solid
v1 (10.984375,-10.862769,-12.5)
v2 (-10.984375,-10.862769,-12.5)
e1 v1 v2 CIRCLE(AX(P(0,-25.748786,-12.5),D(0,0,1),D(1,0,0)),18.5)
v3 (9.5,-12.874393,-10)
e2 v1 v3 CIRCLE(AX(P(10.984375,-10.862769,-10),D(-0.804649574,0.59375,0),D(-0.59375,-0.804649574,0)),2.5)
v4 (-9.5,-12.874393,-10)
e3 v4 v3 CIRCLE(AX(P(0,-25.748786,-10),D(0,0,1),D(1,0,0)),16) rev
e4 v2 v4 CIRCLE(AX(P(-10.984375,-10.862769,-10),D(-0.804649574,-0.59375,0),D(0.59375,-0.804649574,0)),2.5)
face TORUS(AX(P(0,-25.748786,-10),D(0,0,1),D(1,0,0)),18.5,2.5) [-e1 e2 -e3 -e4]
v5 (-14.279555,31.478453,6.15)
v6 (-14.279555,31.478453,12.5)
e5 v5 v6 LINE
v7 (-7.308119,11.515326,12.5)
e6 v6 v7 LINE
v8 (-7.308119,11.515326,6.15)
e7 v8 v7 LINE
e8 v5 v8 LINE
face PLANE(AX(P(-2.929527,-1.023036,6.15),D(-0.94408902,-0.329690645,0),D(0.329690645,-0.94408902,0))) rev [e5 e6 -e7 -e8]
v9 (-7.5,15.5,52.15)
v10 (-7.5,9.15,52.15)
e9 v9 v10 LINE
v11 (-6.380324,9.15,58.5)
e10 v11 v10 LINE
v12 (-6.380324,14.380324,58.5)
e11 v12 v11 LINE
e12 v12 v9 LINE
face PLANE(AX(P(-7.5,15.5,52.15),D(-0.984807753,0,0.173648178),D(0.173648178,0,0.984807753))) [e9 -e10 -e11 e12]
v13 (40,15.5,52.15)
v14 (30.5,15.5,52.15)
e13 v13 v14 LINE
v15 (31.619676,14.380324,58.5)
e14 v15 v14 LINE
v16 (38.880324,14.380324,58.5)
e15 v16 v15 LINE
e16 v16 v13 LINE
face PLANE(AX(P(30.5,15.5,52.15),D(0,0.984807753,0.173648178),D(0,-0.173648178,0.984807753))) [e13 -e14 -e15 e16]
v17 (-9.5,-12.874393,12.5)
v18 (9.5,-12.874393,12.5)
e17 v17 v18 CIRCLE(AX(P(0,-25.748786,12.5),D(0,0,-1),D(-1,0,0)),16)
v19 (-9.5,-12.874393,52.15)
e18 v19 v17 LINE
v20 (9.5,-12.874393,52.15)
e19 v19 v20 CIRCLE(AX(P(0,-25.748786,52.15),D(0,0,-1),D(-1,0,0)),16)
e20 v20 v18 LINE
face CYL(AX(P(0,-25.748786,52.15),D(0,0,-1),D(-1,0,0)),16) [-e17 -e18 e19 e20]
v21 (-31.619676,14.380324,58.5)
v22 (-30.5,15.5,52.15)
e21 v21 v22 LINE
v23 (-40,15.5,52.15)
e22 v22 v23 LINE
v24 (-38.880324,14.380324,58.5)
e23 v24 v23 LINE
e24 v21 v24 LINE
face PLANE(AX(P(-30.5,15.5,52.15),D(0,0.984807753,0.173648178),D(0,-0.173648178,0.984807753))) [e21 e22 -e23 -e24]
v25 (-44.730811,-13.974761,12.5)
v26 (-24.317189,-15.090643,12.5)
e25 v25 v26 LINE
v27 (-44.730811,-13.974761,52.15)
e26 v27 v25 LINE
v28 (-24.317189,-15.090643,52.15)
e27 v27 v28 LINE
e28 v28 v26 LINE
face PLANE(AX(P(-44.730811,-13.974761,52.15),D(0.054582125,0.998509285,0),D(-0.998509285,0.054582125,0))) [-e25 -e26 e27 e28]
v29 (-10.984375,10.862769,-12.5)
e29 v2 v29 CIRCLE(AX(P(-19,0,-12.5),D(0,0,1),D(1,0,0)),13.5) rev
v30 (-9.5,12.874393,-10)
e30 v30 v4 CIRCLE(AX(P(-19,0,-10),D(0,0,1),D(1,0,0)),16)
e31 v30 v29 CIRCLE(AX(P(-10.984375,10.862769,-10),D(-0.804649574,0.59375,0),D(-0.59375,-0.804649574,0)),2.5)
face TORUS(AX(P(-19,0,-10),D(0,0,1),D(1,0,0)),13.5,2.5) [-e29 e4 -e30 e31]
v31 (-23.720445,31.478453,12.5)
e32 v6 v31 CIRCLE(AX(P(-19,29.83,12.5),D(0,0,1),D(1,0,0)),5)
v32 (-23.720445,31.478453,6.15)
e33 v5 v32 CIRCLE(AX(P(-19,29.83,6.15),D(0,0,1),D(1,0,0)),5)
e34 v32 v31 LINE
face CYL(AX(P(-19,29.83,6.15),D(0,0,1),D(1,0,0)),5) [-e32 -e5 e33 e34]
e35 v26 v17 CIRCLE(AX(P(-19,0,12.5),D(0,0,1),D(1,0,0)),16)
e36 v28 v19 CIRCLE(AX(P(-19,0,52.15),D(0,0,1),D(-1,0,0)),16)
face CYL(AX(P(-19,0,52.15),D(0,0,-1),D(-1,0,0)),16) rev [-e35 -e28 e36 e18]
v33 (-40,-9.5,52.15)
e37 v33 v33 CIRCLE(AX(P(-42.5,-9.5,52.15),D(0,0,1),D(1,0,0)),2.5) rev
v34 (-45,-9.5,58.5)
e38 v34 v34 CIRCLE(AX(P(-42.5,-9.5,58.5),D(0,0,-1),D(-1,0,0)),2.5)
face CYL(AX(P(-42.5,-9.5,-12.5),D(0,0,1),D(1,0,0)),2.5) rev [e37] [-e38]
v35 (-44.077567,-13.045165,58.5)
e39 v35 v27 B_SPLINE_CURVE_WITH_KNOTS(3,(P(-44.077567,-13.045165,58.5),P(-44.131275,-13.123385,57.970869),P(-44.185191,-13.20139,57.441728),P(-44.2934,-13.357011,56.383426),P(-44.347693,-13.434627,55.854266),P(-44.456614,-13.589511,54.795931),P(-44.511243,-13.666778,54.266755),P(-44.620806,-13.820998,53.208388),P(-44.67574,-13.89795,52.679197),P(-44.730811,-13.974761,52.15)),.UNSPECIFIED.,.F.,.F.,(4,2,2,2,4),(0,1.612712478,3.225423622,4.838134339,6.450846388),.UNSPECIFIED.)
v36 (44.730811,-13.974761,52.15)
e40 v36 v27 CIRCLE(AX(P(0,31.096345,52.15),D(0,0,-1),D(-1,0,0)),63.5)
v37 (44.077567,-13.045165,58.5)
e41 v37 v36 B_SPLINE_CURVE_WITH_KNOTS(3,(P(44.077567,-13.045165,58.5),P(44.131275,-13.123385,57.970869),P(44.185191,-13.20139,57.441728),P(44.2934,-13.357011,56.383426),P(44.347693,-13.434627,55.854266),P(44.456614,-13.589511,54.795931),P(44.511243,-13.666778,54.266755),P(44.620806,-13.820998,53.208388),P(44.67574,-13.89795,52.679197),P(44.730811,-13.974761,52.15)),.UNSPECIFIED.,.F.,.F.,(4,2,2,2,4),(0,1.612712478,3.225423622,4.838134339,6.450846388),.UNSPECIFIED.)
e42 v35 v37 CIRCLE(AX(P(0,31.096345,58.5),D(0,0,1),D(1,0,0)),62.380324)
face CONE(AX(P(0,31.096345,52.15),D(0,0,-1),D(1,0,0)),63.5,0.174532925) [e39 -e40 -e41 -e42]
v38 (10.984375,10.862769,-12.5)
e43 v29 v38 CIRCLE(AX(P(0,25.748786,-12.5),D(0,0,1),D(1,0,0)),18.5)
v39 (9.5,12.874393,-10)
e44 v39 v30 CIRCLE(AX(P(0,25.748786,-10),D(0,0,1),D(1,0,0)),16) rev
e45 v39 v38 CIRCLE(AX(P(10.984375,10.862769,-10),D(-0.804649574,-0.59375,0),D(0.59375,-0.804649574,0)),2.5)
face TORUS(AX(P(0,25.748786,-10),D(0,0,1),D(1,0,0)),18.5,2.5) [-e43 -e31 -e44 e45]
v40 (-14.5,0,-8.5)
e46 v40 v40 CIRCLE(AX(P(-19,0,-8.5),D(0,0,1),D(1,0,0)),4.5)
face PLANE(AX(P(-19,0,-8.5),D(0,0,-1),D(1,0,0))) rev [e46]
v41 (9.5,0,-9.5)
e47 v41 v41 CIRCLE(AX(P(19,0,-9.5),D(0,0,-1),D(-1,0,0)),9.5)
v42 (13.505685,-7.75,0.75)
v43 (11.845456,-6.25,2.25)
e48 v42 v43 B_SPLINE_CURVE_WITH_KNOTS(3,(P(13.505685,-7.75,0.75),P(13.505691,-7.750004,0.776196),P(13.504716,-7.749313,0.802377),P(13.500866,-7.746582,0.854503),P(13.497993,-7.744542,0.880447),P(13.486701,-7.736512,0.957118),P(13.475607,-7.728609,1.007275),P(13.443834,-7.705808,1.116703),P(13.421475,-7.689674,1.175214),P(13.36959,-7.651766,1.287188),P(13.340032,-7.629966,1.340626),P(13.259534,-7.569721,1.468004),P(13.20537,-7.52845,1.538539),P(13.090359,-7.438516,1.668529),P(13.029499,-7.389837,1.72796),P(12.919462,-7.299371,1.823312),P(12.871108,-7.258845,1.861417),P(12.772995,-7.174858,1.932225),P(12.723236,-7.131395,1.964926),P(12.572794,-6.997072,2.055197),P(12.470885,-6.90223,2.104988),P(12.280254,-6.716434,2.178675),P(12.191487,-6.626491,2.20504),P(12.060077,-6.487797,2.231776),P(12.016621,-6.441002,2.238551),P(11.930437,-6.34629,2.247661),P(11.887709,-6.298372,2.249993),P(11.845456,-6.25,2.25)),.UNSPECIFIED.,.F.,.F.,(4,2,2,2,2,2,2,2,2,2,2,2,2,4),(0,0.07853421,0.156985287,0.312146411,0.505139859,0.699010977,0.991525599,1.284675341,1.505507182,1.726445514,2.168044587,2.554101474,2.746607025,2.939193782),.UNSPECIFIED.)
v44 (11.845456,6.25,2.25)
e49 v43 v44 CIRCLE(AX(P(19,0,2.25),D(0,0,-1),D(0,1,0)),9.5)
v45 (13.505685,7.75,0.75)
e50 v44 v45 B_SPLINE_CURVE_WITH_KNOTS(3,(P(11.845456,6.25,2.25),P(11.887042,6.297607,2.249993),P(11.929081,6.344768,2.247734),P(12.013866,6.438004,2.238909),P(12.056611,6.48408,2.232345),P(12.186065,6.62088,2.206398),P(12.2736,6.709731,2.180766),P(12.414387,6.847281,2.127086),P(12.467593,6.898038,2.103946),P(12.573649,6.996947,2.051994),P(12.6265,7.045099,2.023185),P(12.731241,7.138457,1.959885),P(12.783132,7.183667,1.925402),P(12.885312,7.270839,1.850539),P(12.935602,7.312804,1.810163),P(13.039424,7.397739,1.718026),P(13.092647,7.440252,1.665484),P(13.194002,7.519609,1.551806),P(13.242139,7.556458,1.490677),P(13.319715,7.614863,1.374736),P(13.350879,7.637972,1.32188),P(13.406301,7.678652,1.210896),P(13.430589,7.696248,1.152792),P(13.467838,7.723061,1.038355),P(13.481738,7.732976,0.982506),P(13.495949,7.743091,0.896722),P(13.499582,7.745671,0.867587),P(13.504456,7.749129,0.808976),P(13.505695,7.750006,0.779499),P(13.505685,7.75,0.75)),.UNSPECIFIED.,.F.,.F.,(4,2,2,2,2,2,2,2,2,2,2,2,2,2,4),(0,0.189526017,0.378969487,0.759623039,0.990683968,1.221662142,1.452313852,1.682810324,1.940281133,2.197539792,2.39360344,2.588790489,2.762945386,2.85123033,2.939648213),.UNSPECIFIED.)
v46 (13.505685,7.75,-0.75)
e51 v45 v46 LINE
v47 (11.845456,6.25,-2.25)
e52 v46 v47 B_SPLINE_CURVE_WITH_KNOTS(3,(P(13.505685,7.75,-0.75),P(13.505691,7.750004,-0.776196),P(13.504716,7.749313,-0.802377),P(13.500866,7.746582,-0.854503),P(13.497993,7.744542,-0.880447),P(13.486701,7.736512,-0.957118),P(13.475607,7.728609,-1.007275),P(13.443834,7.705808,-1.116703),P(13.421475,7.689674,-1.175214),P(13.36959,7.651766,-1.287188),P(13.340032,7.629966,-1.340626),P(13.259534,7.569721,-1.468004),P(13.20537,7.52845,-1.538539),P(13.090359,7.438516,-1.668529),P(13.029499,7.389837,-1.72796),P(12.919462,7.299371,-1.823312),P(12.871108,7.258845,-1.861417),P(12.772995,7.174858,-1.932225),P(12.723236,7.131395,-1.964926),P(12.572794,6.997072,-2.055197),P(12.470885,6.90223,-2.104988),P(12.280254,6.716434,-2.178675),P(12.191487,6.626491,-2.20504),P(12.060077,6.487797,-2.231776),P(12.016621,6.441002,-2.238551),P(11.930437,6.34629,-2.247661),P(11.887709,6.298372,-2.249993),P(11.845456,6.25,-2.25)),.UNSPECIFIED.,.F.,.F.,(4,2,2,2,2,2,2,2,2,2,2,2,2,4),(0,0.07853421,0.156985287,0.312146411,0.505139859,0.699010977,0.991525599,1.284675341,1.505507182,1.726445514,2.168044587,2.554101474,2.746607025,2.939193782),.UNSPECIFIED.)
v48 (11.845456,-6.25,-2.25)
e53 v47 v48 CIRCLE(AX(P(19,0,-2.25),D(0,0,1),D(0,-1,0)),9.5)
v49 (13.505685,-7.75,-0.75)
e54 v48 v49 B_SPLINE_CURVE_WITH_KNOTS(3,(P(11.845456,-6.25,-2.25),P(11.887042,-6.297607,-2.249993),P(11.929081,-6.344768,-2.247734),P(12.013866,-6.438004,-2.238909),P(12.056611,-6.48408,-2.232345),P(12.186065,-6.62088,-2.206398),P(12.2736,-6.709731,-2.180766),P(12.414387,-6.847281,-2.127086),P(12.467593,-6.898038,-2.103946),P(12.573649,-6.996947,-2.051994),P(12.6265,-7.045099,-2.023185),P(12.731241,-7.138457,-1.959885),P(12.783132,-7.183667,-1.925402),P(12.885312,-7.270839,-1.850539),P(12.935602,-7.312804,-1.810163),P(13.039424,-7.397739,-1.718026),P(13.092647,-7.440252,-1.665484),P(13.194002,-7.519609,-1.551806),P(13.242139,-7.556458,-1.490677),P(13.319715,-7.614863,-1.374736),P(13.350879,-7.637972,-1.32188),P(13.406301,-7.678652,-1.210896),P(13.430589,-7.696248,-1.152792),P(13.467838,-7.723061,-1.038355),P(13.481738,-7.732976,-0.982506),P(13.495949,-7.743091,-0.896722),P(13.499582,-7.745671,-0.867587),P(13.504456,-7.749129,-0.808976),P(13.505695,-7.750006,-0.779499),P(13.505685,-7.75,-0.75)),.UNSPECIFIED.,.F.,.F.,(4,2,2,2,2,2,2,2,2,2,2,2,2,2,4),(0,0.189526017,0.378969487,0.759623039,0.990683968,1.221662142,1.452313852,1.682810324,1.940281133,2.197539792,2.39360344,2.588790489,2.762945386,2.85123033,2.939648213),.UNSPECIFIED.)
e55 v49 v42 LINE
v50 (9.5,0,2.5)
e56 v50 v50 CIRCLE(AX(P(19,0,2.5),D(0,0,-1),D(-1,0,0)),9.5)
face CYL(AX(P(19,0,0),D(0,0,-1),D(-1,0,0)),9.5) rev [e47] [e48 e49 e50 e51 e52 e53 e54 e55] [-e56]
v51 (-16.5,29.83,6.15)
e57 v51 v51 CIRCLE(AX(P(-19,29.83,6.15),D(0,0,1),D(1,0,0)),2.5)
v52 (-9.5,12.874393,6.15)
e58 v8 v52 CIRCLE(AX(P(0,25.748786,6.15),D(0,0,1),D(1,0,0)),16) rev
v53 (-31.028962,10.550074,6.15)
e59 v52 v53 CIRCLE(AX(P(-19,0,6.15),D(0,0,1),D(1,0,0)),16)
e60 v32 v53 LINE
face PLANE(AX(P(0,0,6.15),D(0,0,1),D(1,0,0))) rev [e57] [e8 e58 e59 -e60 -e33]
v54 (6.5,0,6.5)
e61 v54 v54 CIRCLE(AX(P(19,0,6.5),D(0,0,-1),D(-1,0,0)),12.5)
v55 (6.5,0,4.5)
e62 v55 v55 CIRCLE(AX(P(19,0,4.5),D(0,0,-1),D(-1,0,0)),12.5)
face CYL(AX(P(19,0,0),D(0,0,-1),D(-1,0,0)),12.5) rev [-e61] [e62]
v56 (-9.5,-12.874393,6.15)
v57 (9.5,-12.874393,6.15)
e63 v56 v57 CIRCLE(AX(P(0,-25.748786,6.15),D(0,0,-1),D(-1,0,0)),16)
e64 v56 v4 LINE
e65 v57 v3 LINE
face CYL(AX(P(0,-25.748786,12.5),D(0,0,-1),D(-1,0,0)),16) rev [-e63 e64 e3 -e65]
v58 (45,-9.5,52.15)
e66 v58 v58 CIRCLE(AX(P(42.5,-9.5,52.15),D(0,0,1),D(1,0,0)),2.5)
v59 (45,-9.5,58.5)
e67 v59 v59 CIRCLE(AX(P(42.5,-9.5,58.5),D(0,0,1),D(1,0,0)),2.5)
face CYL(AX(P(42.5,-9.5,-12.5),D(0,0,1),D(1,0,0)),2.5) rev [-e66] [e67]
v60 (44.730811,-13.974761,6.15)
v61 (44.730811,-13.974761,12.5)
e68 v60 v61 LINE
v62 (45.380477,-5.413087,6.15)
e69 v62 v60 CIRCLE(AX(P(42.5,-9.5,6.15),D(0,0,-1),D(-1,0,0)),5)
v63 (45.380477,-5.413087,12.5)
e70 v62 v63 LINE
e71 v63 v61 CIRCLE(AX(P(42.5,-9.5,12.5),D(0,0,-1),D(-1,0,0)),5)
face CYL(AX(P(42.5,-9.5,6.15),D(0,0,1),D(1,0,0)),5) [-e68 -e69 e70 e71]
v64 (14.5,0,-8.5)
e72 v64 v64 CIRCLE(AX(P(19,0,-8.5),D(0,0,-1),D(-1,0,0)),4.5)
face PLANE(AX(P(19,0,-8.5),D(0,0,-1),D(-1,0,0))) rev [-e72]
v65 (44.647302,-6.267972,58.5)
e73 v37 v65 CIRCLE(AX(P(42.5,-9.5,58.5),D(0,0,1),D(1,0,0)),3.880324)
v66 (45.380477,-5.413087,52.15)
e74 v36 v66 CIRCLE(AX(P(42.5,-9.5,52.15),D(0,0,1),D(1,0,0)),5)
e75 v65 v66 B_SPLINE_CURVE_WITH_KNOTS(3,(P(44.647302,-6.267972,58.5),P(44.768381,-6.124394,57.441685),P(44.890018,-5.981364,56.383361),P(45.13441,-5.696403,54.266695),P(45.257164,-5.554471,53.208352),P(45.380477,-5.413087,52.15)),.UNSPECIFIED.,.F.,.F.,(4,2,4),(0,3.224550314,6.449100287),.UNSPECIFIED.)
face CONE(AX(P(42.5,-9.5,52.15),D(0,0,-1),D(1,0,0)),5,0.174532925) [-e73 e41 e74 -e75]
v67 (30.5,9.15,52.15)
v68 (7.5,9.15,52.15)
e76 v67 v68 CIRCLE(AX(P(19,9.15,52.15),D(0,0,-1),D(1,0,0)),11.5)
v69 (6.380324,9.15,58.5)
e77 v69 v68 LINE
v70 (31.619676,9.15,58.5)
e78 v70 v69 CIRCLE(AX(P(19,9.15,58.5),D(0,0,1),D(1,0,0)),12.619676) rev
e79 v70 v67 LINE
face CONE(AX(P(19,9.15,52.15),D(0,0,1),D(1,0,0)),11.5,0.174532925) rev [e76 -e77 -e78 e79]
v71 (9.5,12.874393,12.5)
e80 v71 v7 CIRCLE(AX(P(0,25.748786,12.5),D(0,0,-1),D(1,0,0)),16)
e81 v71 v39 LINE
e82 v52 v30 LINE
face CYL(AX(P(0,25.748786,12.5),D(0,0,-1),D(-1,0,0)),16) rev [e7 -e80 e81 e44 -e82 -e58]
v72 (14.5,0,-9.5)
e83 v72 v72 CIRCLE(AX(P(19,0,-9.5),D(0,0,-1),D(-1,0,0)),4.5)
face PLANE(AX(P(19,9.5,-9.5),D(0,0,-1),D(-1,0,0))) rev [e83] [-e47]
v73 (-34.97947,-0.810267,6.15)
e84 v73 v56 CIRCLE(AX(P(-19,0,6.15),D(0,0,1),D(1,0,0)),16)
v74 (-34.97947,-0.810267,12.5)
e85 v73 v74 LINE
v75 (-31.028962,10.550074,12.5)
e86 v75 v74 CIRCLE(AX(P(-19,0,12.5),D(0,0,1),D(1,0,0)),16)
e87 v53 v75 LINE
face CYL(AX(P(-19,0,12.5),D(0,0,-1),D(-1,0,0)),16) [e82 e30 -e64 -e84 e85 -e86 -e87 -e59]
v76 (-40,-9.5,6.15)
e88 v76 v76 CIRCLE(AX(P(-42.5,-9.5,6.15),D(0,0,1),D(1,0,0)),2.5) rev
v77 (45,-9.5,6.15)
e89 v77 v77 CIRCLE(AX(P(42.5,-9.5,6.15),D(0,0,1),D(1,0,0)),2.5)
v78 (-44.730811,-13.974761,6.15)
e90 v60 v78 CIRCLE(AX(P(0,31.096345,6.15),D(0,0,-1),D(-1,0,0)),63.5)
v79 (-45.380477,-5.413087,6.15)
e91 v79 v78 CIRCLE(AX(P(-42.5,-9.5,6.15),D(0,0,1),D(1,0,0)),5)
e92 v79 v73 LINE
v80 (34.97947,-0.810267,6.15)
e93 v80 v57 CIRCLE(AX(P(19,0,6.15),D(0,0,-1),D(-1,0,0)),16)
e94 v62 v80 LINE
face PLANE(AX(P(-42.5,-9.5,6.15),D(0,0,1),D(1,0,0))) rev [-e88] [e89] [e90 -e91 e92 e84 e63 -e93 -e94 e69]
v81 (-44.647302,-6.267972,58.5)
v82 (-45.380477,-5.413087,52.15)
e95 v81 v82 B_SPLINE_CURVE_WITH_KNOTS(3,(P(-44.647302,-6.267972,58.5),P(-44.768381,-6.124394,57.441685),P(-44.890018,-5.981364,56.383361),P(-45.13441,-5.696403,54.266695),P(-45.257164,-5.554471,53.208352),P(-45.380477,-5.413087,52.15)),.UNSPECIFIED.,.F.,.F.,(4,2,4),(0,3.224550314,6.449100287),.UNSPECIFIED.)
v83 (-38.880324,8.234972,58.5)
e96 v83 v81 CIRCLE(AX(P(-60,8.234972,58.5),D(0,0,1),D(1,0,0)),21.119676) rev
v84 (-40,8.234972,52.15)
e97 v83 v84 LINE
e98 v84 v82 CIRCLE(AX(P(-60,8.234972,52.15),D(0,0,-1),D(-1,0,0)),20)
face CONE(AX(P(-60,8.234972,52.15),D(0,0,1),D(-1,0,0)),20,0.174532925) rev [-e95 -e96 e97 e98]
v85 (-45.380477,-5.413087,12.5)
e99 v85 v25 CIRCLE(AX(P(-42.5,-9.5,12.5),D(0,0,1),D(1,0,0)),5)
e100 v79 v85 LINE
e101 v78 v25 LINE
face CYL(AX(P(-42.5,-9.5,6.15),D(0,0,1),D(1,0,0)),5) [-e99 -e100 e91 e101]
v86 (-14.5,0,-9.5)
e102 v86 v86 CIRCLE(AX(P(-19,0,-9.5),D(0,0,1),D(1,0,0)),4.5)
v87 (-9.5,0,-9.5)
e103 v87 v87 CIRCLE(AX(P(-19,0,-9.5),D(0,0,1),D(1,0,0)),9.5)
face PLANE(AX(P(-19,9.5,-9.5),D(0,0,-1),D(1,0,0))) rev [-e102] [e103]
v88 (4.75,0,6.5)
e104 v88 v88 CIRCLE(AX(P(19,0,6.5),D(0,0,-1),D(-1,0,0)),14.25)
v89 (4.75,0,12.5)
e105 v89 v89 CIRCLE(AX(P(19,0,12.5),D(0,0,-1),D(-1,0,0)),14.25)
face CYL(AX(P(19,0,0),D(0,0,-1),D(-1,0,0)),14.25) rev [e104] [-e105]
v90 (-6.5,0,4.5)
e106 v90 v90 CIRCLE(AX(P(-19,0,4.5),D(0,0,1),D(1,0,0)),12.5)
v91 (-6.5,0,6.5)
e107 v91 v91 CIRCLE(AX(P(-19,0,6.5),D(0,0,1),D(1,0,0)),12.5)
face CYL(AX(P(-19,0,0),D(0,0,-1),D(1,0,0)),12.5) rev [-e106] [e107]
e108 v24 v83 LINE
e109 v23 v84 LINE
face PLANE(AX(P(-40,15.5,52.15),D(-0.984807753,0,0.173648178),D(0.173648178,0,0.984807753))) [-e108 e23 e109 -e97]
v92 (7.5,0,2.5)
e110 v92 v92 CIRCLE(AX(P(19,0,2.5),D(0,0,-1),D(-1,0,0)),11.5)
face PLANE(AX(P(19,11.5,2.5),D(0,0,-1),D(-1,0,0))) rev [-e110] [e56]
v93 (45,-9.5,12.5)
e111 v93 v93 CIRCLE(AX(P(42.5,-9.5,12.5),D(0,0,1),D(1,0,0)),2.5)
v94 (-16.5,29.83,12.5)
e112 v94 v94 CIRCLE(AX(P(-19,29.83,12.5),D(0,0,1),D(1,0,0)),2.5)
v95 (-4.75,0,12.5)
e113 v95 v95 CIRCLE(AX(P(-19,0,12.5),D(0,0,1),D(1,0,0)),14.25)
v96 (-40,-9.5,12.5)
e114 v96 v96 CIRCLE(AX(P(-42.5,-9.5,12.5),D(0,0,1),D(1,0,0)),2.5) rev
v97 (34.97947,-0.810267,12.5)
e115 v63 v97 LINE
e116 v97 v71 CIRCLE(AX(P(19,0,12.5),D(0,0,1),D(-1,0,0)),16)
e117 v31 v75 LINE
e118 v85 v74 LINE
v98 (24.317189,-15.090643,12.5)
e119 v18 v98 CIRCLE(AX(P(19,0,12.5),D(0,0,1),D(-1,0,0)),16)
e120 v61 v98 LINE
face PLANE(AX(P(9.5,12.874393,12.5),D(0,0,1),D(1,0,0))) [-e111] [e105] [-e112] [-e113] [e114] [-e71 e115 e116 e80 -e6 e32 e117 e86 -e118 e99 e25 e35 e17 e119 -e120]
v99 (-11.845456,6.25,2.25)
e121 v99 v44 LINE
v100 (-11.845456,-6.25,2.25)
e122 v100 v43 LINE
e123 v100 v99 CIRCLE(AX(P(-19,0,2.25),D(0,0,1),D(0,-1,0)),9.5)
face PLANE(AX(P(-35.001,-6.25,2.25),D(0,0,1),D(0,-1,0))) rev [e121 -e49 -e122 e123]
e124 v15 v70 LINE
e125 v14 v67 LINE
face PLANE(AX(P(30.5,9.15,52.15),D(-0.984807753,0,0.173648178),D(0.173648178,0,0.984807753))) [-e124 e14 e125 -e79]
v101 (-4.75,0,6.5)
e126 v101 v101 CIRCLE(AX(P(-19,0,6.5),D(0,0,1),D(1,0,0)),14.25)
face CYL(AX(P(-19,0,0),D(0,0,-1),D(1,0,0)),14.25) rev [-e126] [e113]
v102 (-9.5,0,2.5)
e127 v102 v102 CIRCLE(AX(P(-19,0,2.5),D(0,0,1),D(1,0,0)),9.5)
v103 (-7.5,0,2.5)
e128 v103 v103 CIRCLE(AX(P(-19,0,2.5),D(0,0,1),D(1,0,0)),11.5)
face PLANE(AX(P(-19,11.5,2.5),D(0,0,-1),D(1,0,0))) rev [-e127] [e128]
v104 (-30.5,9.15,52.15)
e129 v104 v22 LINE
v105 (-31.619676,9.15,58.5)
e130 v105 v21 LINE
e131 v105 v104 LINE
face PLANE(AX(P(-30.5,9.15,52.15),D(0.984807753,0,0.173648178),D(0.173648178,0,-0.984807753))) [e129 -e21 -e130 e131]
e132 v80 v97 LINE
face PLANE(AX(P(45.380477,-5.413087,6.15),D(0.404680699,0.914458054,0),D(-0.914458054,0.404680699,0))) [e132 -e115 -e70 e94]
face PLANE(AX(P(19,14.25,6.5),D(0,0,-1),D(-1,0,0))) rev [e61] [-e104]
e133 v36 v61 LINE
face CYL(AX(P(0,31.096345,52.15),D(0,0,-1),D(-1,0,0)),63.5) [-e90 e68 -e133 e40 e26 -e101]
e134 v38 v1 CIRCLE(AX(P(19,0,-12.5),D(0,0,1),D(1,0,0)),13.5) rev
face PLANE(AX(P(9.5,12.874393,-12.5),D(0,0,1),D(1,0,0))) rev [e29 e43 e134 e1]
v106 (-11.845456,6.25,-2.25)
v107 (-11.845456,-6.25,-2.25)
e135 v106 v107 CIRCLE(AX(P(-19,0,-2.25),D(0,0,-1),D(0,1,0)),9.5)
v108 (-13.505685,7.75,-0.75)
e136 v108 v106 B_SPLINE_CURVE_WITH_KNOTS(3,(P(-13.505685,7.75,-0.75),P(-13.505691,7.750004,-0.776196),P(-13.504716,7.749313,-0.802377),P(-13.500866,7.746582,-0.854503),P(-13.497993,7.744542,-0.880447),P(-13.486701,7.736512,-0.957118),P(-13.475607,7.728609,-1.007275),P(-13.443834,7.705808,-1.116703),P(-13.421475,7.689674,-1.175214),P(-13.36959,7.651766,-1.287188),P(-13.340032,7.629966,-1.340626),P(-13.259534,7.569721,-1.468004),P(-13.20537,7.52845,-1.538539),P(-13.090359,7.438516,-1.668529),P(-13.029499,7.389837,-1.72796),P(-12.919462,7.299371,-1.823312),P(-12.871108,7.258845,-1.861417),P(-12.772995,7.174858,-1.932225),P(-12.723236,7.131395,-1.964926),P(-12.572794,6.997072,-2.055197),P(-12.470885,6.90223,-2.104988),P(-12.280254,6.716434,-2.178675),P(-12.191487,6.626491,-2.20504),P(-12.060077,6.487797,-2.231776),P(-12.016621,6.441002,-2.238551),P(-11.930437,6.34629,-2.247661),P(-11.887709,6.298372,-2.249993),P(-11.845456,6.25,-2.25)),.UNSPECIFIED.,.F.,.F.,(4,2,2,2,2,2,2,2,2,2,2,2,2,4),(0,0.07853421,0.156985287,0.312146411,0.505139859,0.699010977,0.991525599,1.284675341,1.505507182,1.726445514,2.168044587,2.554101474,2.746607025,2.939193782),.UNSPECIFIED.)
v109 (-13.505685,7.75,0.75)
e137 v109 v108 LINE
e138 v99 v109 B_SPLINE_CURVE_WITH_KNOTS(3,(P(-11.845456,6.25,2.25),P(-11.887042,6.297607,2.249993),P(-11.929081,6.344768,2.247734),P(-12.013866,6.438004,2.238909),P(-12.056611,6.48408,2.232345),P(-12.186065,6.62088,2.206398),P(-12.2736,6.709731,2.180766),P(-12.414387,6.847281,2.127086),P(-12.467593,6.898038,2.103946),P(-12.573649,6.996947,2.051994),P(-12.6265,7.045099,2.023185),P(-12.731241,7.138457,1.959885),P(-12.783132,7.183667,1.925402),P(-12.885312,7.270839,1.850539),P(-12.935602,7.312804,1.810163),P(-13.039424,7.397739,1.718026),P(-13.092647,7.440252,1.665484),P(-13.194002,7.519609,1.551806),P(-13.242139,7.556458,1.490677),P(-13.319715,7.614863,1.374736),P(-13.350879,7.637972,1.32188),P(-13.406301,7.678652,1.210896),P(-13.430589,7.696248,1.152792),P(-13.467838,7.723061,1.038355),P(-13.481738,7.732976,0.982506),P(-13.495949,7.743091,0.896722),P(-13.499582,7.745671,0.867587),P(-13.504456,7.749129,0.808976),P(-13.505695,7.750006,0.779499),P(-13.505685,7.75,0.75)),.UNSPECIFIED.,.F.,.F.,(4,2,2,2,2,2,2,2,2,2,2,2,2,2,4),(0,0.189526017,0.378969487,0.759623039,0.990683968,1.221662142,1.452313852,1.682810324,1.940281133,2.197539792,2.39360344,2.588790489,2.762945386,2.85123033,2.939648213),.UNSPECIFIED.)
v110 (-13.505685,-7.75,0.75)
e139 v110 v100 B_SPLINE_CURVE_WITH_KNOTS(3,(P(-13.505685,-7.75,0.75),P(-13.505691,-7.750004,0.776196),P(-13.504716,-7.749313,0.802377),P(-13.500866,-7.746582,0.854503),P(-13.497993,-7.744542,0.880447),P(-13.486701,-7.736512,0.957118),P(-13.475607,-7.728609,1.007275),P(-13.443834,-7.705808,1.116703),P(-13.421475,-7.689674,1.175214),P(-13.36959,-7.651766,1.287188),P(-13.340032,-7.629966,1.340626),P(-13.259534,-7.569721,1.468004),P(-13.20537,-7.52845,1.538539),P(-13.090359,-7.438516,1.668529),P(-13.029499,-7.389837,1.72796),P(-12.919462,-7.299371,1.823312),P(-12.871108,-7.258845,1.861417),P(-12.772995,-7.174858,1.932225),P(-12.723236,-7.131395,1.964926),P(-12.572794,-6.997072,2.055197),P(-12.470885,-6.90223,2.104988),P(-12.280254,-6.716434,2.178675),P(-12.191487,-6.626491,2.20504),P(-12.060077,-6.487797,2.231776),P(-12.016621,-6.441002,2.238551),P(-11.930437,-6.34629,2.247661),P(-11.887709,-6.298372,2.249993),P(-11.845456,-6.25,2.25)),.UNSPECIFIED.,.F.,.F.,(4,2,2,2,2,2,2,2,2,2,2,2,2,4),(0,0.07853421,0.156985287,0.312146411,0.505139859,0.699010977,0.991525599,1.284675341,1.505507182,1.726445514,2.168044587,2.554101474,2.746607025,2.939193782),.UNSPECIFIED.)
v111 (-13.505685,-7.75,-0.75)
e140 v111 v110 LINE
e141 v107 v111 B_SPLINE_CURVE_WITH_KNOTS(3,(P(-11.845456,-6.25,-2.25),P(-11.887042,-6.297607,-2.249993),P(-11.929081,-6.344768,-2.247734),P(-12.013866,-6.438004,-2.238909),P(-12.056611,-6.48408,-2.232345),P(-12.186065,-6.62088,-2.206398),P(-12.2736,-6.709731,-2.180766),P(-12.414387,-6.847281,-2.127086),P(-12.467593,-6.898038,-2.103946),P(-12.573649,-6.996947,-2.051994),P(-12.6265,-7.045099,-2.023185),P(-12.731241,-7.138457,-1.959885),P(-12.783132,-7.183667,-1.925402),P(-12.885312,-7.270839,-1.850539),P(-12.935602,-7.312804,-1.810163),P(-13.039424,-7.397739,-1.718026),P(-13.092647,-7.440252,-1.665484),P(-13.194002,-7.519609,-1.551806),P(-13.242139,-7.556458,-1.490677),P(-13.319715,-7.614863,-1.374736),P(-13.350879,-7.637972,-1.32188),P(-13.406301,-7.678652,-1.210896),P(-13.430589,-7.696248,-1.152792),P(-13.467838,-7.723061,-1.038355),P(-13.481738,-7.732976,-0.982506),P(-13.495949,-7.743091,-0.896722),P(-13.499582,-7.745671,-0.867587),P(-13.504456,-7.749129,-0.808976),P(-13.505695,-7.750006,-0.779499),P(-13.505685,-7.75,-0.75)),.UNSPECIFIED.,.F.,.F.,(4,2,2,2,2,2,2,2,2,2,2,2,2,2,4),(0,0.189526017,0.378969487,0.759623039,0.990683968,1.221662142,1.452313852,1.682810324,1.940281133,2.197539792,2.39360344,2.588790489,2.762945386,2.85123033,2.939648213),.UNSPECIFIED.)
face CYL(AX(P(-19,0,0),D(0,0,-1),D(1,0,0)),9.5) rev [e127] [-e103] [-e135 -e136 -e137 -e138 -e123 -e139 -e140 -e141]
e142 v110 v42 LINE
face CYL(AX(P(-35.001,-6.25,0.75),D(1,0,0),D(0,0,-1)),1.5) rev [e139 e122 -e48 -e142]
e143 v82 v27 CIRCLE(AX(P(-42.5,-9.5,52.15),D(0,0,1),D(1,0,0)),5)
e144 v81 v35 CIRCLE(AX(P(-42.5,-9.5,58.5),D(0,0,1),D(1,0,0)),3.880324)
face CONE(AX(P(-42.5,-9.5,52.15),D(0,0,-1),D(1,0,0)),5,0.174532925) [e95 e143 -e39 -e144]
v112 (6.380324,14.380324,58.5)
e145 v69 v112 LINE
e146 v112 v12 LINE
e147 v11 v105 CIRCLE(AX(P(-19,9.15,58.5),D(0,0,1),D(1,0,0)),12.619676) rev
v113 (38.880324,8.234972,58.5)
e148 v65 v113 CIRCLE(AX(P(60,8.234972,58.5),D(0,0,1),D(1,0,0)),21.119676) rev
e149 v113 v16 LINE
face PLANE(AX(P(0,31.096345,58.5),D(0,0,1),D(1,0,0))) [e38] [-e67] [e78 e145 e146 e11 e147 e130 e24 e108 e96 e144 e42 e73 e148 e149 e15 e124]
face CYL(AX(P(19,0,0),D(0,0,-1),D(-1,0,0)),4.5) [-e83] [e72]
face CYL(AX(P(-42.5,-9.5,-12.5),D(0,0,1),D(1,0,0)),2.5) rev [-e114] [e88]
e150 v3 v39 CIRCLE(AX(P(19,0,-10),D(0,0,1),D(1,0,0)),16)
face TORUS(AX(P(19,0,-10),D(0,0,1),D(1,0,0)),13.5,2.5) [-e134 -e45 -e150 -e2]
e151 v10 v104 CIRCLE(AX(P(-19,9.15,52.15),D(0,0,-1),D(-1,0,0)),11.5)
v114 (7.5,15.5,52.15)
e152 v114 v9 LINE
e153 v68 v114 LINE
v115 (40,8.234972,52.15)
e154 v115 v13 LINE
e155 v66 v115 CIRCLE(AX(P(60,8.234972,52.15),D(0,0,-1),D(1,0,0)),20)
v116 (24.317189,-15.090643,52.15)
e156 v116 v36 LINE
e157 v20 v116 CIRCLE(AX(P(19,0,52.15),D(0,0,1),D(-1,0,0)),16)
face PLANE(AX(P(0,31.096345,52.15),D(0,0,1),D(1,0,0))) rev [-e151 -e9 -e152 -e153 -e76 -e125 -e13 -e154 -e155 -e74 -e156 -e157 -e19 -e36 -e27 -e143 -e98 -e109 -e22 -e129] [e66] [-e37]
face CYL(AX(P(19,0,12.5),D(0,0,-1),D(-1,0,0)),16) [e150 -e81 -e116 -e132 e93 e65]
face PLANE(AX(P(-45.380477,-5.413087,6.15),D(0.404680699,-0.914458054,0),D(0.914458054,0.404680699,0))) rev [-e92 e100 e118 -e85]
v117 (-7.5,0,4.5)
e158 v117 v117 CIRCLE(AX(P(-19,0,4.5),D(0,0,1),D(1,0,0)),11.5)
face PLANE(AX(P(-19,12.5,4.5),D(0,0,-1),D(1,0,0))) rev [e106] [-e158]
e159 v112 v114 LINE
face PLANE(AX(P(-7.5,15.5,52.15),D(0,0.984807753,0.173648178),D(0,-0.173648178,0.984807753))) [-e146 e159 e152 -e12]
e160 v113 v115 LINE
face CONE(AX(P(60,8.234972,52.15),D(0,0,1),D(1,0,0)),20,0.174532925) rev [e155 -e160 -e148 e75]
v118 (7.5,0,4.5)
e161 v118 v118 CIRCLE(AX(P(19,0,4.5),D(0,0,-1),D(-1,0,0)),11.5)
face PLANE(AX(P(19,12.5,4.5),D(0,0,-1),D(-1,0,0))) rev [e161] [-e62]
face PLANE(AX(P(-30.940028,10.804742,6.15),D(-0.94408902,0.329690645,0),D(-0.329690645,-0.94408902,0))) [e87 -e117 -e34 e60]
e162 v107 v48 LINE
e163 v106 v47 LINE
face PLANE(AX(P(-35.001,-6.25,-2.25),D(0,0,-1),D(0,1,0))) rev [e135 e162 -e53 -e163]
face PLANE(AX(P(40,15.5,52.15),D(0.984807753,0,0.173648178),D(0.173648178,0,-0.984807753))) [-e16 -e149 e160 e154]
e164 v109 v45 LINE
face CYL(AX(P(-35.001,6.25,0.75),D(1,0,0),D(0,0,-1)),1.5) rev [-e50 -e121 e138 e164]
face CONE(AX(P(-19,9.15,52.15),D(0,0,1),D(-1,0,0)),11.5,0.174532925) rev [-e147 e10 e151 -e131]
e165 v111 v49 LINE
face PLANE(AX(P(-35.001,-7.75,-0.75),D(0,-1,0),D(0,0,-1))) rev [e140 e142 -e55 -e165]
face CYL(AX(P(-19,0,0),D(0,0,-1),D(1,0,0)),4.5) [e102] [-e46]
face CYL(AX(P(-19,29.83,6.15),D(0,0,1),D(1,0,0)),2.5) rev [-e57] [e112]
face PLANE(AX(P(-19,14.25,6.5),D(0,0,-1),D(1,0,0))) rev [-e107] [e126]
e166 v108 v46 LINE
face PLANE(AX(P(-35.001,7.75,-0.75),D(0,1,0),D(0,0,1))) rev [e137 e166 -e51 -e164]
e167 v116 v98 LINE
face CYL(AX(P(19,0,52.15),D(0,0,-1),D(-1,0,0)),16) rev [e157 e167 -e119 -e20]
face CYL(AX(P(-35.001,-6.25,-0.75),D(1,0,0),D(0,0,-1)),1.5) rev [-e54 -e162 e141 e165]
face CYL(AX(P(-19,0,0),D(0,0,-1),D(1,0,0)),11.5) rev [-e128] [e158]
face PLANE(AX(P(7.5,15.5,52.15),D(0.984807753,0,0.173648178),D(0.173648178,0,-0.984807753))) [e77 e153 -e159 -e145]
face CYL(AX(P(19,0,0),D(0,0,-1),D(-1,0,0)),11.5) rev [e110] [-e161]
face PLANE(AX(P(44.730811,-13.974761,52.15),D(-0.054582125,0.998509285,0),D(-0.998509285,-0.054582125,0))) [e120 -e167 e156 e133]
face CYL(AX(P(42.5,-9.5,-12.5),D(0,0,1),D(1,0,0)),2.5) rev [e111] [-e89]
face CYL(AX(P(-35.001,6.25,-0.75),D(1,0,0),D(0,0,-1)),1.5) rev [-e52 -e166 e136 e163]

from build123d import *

# Parameters (mm, degrees)
BOSS_EXTRUDE1_DEPTH                 = 12.5
CUT_EXTRUDE1_REACH                  = 42.463
CUT_EXTRUDE1_END_RADIUS             = 9.5
CUT_EXTRUDE1_DIRECTION_2_REACH      = 42.463
CUT_EXTRUDE1_DIRECTION_2_END_RADIUS = 9.5
BOSS_EXTRUDE3_DEPTH                 = 6.35
SKETCH5_R                           = 2.5
BOSS_EXTRUDE4_DEPTH                 = 6.35
BOSS_EXTRUDE5_START                 = -46
BOSS_EXTRUDE5_DEPTH                 = 46
BOSS_EXTRUDE6_DEPTH                 = 6.35
BOSS_EXTRUDE6_DRAFT                 = 10
HOLE1_START                         = 6.15
HOLE1_OUTLINE_R                     = 2.5
HOLE1_DEPTH                         = 52.35
FILLET1_R                           = 2.5


# Read off the part's stored shape, not the designer's step: Hole1
with BuildPart() as part:
    # Sketch1 → Boss-Extrude1 (new, symmetric)
    with BuildSketch(Plane.XY):
        with BuildLine():
            ThreePointArc((-9.5, 12.87439319), (-35, 0), (-9.5, -12.87439319))
            ThreePointArc((-9.5, -12.87439319), (0, -9.748786379), (9.5, -12.87439319))
            ThreePointArc((9.5, -12.87439319), (35, 0), (9.5, 12.87439319))
            ThreePointArc((9.5, 12.87439319), (0, 9.748786379), (-9.5, 12.87439319))
        make_face()
    extrude(amount=BOSS_EXTRUDE1_DEPTH, both=True)

    # Sketch2 → Cut-Revolve1 (revolve, cut)
    with BuildSketch(Plane(origin=(19, 0, 0), x_dir=(0, 0, -1), z_dir=(1, 0, 0)), mode=Mode.PRIVATE) as cut_revolve1_sk:
        Polygon((-12.5, 0), (-12.5, 14.25), (-6.5, 14.25), (-6.5, 12.5), (-4.5, 12.5), (-4.5, 11.5), (-2.5, 11.5), (-2.5, 9.5), (9.5, 9.5), (9.5, 4.5), (8.5, 4.5), (8.5, 0), align=None)
    cut_revolve1 = revolve(cut_revolve1_sk.sketch.rotate(Axis((19, 0, 0), (0, 0, 1)), 90), axis=Axis((19, 0, 0), (0, 0, 1)), mode=Mode.SUBTRACT)

    # Mirror1: Cut-Revolve1 across plane
    add(cut_revolve1.mirror(Plane(origin=(0, 0, 0), x_dir=(0, 0, 1), z_dir=(1, 0, 0))), mode=Mode.SUBTRACT)

    # Cut-Extrude1: up to this cylinder (the profile starts outside it)
    cut_extrude1_end = Plane(origin=(-19, 0, 0), z_dir=(0, 0, -1)) * Cylinder(CUT_EXTRUDE1_END_RADIUS, 104.926, mode=Mode.PRIVATE)
    # Sketch3 → Cut-Extrude1 (cut, up to the surface)
    with BuildSketch(Plane(origin=(0, 0, 0), x_dir=(0, 0, -1), z_dir=(1, 0, 0)), mode=Mode.PRIVATE) as cut_extrude1_sk1:
        with BuildLine():
            Line((0.75, -7.75), (-0.75, -7.75))
            ThreePointArc((-0.75, -7.75), (-1.810660172, -7.310660172), (-2.25, -6.25))
            Line((-2.25, -6.25), (-2.25, 6.25))
            ThreePointArc((-2.25, 6.25), (-1.810660172, 7.310660172), (-0.75, 7.75))
            Line((-0.75, 7.75), (0.75, 7.75))
            ThreePointArc((0.75, 7.75), (1.810660172, 7.310660172), (2.25, 6.25))
            Line((2.25, 6.25), (2.25, -6.25))
            ThreePointArc((2.25, -6.25), (1.810660172, -7.310660172), (0.75, -7.75))
        make_face()
    cut_extrude1_tool1 = extrude(cut_extrude1_sk1.sketch, amount=-CUT_EXTRUDE1_REACH, mode=Mode.PRIVATE) - cut_extrude1_end
    add(cut_extrude1_tool1.solids().sort_by_distance((0, 0, 0))[0], mode=Mode.SUBTRACT)

    # Cut-Extrude1 direction 2: up to this cylinder (the profile starts outside it)
    cut_extrude1_direction_2_end = Plane(origin=(19, 0, 0), z_dir=(0, 0, -1)) * Cylinder(CUT_EXTRUDE1_DIRECTION_2_END_RADIUS, 104.926, mode=Mode.PRIVATE)
    # Sketch3 → Cut-Extrude1 direction 2 (cut, up to the surface)
    with BuildSketch(Plane(origin=(0, 0, 0), x_dir=(0, 0, -1), z_dir=(1, 0, 0)), mode=Mode.PRIVATE) as cut_extrude1_direction_2_sk1:
        with BuildLine():
            Line((0.75, -7.75), (-0.75, -7.75))
            ThreePointArc((-0.75, -7.75), (-1.810660172, -7.310660172), (-2.25, -6.25))
            Line((-2.25, -6.25), (-2.25, 6.25))
            ThreePointArc((-2.25, 6.25), (-1.810660172, 7.310660172), (-0.75, 7.75))
            Line((-0.75, 7.75), (0.75, 7.75))
            ThreePointArc((0.75, 7.75), (1.810660172, 7.310660172), (2.25, 6.25))
            Line((2.25, 6.25), (2.25, -6.25))
            ThreePointArc((2.25, -6.25), (1.810660172, -7.310660172), (0.75, -7.75))
        make_face()
    cut_extrude1_direction_2_tool1 = extrude(cut_extrude1_direction_2_sk1.sketch, amount=CUT_EXTRUDE1_DIRECTION_2_REACH, mode=Mode.PRIVATE) - cut_extrude1_direction_2_end
    add(cut_extrude1_direction_2_tool1.solids().sort_by_distance((0, 0, 0))[0], mode=Mode.SUBTRACT)

    # Sketch4 → Boss-Extrude3 (add)
    with BuildSketch(Plane.XY.offset(12.5)):
        with BuildLine():
            Line((-45.380476721, -5.413087491), (-34.979470203, -0.810266645))
            ThreePointArc((-34.979470203, -0.810266645), (-31.820655502, -9.572397426), (-24.317188777, -15.090642912))
            Line((-24.317188777, -15.090642912), (-44.730811053, -13.974760557))
            ThreePointArc((-44.730811053, -13.974760557), (-47.485667167, -9.87831587), (-45.380476721, -5.413087491))
        make_face()
    boss_extrude3 = extrude(amount=-BOSS_EXTRUDE3_DEPTH)

    # Mirror2: Boss-Extrude3 across plane
    add(boss_extrude3.mirror(Plane(origin=(0, 0, 0), x_dir=(0, 0, 1), z_dir=(1, 0, 0))))

    # Sketch5 → Boss-Extrude4 (add)
    with BuildSketch(Plane.XY.offset(12.5)):
        with BuildLine():
            ThreePointArc((-14.279554898, 31.478453226), (-19, 34.83), (-23.720445102, 31.478453226))
            Line((-23.720445102, 31.478453226), (-31.028962191, 10.550074342))
            ThreePointArc((-31.028962191, 10.550074342), (-20.717418693, 15.907560248), (-9.5, 12.87439319))
            ThreePointArc((-9.5, 12.87439319), (-8.431487389, 12.150623988), (-7.308118696, 11.515325762))
            Line((-7.308118696, 11.515325762), (-14.279554898, 31.478453226))
        make_face()
        with Locations((-19, 29.83)):
            Circle(SKETCH5_R, mode=Mode.SUBTRACT)
    extrude(amount=-BOSS_EXTRUDE4_DEPTH)

    # Sketch6 → Boss-Extrude5 (add)
    with BuildSketch(Plane(origin=(0, 0, 6.15), x_dir=(-1, 0, 0), z_dir=(0, 0, -1)).offset(BOSS_EXTRUDE5_START)):
        with BuildLine():
            Line((44.730811053, -13.974760557), (24.317188777, -15.090642912))
            ThreePointArc((24.317188777, -15.090642912), (16.633162841, -15.823971747), (9.5, -12.87439319))
            ThreePointArc((9.5, -12.87439319), (0, -9.748786379), (-9.5, -12.87439319))
            ThreePointArc((-9.5, -12.87439319), (-16.633162841, -15.823971747), (-24.317188777, -15.090642912))
            Line((-24.317188777, -15.090642912), (-44.730811053, -13.974760557))
            ThreePointArc((-44.730811053, -13.974760557), (0, -32.403655151), (44.730811053, -13.974760557))
        make_face()
    extrude(amount=BOSS_EXTRUDE5_DEPTH)


with BuildPart() as boss_extrude6_tool:
    # Sketch7 → Boss-Extrude6 (with draft: the straight prism first)
    with BuildSketch(Plane.XY.offset(52.15)):
        with BuildLine():
            Line((-7.5, 15.5), (-7.5, 9.15))
            ThreePointArc((-7.5, 9.15), (-19, -2.35), (-30.5, 9.15))
            Line((-30.5, 9.15), (-30.5, 15.5))
            Line((-30.5, 15.5), (-40, 15.5))
            Line((-40, 15.5), (-40, 8.234972412))
            ThreePointArc((-40, 8.234972412), (-41.393677612, 0.899799121), (-45.380476721, -5.413087491))
            ThreePointArc((-45.380476721, -5.413087491), (-47.485667167, -9.87831587), (-44.730811053, -13.974760557))
            ThreePointArc((-44.730811053, -13.974760557), (0, -32.403655151), (44.730811053, -13.974760557))
            ThreePointArc((44.730811053, -13.974760557), (47.485667167, -9.87831587), (45.380476721, -5.413087491))
            ThreePointArc((45.380476721, -5.413087491), (41.393677612, 0.899799121), (40, 8.234972412))
            Line((40, 8.234972412), (40, 15.5))
            Line((40, 15.5), (30.5, 15.5))
            Line((30.5, 15.5), (30.5, 9.15))
            ThreePointArc((30.5, 9.15), (19, -2.35), (7.5, 9.15))
            Line((7.5, 9.15), (7.5, 15.5))
            Line((7.5, 15.5), (-7.5, 15.5))
        make_face()
    extrude(amount=BOSS_EXTRUDE6_DEPTH)
    # Boss-Extrude6: the draft: its side faces are tilted about the plane it starts from
    boss_extrude6_sides = [boss_extrude6_tool.faces().sort_by_distance(p)[0] for p in [
        (0, -32.403655151, 55.325),
        (47.485667167, -9.87831587, 55.325),
        (41.393677612, 0.899799121, 55.325),
        (40, 11.867486206, 55.325),
        (35.25, 15.5, 55.325),
        (30.5, 12.325, 55.325),
        (19, -2.35, 55.325),
        (7.5, 12.325, 55.325),
        (0, 15.5, 55.325),
        (-7.5, 12.325, 55.325),
        (-19, -2.35, 55.325),
        (-30.5, 12.325, 55.325),
        (-35.25, 15.5, 55.325),
        (-40, 11.867486206, 55.325),
        (-41.393677612, 0.899799121, 55.325),
        (-47.485667167, -9.87831587, 55.325),
    ]]
    draft(boss_extrude6_sides, Plane.XY.offset(52.15), BOSS_EXTRUDE6_DRAFT)


with BuildPart() as part_1:
    add(part.part)

    # Boss-Extrude6: add boss_extrude6_tool
    add(boss_extrude6_tool.part)

    # Hole1 outline → Hole1 (cut)
    with BuildSketch(Plane.XY.offset(HOLE1_START)):
        with Locations((42.5, -9.5)):
            Circle(HOLE1_OUTLINE_R)
    hole1 = extrude(amount=HOLE1_DEPTH, mode=Mode.SUBTRACT)

    # Mirror3: Hole1 across plane
    add(hole1.mirror(Plane(origin=(0, 0, 0), x_dir=(0, 0, 1), z_dir=(1, 0, 0))), mode=Mode.SUBTRACT)

    # Fillet1
    fillet1_edges = [part_1.edges().sort_by_distance(p)[0] for p in [
        (35, 0, -12.5),
        (0, -9.748786379, -12.5),
        (-35, 0, -12.5),
        (0, 9.748786379, -12.5),
    ]]
    fillet(fillet1_edges, radius=FILLET1_R)


solid = part_1.part
